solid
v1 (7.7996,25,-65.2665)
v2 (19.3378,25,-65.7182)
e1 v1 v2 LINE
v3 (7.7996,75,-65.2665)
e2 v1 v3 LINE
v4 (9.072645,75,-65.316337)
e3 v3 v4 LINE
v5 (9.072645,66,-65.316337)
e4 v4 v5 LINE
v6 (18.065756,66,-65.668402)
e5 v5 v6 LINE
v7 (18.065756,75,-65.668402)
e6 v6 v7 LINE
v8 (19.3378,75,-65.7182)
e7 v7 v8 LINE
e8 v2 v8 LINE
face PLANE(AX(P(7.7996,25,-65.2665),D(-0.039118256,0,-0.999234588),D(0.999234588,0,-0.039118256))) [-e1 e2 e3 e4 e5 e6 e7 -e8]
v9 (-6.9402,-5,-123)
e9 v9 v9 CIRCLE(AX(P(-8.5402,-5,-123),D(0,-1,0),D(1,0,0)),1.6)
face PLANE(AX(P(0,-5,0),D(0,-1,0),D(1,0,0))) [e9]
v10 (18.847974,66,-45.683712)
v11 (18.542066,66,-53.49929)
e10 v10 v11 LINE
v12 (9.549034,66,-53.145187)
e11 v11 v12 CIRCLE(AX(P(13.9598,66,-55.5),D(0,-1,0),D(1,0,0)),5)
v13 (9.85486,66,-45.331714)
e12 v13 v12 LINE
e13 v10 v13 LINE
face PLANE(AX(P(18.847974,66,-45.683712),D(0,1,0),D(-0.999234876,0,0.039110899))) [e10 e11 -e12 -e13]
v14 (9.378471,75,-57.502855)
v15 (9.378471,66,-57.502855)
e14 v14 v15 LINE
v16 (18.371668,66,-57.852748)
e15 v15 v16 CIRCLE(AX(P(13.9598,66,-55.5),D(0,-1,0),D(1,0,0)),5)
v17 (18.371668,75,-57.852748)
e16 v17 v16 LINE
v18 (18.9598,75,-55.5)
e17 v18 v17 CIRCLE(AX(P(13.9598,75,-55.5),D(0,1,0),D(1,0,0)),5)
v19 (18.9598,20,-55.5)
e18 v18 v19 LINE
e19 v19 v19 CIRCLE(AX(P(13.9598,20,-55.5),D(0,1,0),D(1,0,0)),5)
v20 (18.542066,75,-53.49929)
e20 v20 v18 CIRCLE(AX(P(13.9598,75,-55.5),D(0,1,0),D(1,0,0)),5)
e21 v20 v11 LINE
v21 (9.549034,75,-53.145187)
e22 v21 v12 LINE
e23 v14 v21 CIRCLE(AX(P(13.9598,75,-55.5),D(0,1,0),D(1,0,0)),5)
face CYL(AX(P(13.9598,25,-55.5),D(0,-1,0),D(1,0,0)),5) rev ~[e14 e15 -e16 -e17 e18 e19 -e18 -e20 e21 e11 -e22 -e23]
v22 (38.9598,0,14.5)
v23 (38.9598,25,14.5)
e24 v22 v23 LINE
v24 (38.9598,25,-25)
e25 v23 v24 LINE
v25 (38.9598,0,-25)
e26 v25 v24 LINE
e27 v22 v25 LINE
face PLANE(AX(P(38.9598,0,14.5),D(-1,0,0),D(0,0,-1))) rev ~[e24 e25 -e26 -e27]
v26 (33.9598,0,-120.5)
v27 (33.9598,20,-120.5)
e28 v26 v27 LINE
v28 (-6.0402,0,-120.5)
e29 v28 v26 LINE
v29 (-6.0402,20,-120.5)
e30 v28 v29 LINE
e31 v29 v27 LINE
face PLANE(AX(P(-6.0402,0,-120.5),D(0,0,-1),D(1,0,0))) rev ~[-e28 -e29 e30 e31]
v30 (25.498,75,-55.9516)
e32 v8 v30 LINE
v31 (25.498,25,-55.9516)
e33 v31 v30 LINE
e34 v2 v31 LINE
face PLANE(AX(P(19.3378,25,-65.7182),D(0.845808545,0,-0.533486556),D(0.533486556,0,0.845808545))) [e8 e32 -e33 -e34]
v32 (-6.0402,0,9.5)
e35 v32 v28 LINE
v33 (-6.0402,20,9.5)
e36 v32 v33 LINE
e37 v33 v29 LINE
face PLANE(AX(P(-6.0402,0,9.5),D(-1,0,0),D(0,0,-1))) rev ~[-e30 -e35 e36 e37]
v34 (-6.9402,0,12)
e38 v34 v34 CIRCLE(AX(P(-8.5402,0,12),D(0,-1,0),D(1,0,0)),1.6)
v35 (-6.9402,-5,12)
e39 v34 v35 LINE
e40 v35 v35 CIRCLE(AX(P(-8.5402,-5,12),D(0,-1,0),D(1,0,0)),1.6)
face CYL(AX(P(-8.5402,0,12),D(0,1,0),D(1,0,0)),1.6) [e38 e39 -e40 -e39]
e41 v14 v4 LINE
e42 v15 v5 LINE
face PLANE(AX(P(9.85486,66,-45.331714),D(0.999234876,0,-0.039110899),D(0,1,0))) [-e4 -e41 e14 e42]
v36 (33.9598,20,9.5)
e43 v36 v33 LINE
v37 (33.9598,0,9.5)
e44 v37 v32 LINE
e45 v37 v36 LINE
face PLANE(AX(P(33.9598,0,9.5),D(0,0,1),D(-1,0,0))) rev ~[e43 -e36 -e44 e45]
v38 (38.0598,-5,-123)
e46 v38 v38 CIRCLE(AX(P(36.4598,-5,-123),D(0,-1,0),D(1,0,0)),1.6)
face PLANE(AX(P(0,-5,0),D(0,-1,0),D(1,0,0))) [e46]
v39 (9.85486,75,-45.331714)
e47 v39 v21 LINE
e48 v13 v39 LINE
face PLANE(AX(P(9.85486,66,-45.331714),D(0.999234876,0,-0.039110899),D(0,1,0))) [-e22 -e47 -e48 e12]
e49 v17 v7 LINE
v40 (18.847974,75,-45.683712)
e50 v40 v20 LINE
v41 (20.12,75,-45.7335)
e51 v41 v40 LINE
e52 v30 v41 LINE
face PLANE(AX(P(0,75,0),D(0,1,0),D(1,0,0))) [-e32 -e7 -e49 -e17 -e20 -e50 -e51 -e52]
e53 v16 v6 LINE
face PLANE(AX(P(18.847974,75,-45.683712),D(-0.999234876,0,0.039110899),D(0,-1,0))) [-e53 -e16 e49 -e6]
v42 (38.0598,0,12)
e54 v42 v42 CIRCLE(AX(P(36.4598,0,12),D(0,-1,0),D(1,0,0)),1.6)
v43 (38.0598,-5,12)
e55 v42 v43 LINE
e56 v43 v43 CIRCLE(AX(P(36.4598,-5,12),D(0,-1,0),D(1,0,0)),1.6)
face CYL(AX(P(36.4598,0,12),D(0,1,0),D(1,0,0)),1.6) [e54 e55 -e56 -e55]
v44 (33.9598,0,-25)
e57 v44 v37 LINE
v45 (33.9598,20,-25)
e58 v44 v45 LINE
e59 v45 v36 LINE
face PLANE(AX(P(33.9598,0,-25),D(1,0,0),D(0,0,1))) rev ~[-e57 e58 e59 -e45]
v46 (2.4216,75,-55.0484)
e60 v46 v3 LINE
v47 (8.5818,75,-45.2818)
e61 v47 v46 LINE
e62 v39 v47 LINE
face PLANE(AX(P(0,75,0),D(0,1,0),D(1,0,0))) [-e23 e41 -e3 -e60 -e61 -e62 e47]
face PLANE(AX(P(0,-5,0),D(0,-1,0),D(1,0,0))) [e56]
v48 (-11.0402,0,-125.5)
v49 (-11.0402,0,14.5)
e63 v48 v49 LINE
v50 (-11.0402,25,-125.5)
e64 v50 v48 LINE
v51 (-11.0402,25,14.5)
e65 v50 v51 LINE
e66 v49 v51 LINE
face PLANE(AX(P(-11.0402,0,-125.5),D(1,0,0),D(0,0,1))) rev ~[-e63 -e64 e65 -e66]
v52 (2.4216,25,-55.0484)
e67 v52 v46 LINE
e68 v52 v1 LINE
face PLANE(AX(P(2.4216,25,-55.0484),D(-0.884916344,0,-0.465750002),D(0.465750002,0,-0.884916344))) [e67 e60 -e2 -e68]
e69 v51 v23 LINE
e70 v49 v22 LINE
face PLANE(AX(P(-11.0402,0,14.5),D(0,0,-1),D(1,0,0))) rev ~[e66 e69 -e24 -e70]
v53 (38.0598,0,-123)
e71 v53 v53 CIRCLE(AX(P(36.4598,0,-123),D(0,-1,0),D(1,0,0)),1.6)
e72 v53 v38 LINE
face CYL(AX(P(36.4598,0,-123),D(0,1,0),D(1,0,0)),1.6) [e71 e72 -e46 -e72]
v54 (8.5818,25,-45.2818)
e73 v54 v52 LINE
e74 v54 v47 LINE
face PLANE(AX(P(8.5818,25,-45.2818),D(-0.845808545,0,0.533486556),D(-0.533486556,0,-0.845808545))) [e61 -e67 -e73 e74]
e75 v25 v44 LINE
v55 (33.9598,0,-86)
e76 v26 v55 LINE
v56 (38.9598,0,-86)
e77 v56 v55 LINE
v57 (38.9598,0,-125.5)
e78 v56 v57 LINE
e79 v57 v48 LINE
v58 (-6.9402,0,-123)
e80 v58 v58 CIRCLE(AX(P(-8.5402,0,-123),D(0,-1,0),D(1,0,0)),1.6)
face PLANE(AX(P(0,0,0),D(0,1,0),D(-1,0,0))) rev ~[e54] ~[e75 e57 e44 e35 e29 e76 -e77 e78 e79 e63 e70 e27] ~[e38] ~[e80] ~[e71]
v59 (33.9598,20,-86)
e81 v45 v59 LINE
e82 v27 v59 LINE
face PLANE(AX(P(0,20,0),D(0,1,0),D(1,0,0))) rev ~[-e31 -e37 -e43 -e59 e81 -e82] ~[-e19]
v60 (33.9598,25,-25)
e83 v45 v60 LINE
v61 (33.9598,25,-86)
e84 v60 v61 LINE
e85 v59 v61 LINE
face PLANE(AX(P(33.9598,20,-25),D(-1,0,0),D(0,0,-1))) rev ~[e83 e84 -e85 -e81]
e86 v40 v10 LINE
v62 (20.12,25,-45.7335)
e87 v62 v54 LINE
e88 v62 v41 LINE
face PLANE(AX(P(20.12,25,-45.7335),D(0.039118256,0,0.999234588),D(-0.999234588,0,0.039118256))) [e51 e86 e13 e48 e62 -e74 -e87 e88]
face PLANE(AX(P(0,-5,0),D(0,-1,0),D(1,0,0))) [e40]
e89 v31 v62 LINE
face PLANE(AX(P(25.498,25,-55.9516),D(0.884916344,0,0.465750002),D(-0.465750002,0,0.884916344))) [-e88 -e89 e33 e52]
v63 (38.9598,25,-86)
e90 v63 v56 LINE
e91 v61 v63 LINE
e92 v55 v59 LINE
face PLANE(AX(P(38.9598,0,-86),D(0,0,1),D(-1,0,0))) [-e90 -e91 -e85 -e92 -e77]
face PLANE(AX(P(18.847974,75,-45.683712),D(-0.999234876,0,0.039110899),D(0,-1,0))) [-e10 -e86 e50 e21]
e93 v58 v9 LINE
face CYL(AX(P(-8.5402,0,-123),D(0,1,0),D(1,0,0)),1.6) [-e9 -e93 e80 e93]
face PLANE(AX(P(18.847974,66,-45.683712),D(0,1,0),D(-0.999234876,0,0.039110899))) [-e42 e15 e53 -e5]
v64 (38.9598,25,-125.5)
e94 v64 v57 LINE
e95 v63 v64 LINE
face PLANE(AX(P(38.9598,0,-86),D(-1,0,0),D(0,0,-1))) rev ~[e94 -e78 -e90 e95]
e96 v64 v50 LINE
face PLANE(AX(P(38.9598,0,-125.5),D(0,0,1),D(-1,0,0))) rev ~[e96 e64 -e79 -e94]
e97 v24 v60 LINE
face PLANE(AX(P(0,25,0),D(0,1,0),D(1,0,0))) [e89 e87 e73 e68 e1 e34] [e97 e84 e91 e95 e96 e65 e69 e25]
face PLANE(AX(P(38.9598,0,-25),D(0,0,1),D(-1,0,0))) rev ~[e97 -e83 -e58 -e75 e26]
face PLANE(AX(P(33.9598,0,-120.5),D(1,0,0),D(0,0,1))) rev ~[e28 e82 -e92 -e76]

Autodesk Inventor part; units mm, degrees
ref_plane "YZ Plane" through (0, 0, 0) normal (1, 0, 0) x (0, 1, 0)
ref_plane "XZ Plane" through (0, 0, 0) normal (0, 1, 0) x (-1, 0, 0)
ref_plane "XY Plane" through (0, 0, 0) normal (0, 0, 1) x (1, 0, 0)
sketch "Sketch1" plane through (0, 0, 0) normal (0, 1, 0) x (-1, 0, 0)
  point P0 (0, 0)
sketch "Sketch2" plane through (0, 0, 0) normal (0, 1, 0) x (-1, 0, 0)
  line L0 (11.0402, 14.5) -> (-38.9598, 14.5)
  line L1 (-38.9598, -125.5) -> (11.0402, -125.5)
  line L2 (11.0402, -125.5) -> (11.0402, 14.5)
  line L3 (-38.9598, -25) -> (-33.9598, -25)
  line L4 (-38.9598, -86) -> (-33.9598, -86)
  line L5 (-38.9598, 14.5) -> (-38.9598, -25)
  line L6 (-38.9598, -86) -> (-38.9598, -125.5)
  line L7 (-33.9598, -25) -> (-33.9598, 9.5)
  line L8 (-33.9598, 9.5) -> (6.0402, 9.5)
  line L9 (6.0402, 9.5) -> (6.0402, -120.5)
  line L10 (6.0402, -120.5) -> (-33.9598, -120.5)
  line L11 (-33.9598, -120.5) -> (-33.9598, -86)
  point P0 (0, 0)
  dimension "d0" = 50
  dimension "d1" = 140
  dimension "d2" = 5
  dimension "d3" = 39.5
  dimension "d4" = 39.5
  dimension "d5" = 34.5
  dimension "d6" = 40
  dimension "d7" = 130
extrude "Extrusion1" add sketch "Sketch2" along normal blind 20
sketch "Sketch3" plane through (0, 20, 0) normal (0, 1, 0) x (1, 0, 0)
  line L0 (-11.0402, 125.5) -> (-11.0402, -14.5) projected
  line L1 (38.9598, 125.5) -> (-11.0402, 125.5) projected
  line L2 (-11.0402, -14.5) -> (38.9598, -14.5)
  line L3 (38.9598, 125.5) -> (-11.0402, 125.5)
  line L4 (-11.0402, 125.5) -> (-11.0402, -14.5)
  line L5 (33.9598, 86) -> (38.9598, 86) projected
  line L6 (38.9598, 25) -> (33.9598, 25) projected
  line L7 (33.9598, 25) -> (33.9598, -9.5) projected
  line L8 (33.9598, 25) -> (33.9598, 86)
  line L9 (38.9598, -14.5) -> (38.9598, 25)
  line L10 (38.9598, 86) -> (38.9598, 125.5)
  point P0 (0, 0)
extrude "Extrusion2" add sketch "Sketch3" along normal blind 5
sketch "Sketch4" plane through (0, 25, 0) normal (0, 1, 0) x (1, 0, 0)
  circle A0 centre (13.9598, 55.5) radius 5
  line L0 (-11.0402, -14.5) -> (38.9598, -14.5) projected
  line L1 (38.9598, 86) -> (38.9598, 125.5) projected
  point P0 (0, 0)
  dimension "d12" = 10
  dimension "d13" = 70
  dimension "d14" = 25
extrude "Extrusion3" cut sketch "Sketch4" against normal blind 5
sketch "Sketch5" plane through (0, 0, 0) normal (0, -1, 0) x (1, 0, 0)
  circle A0 centre (36.4598, 12) radius 1.6
  line L0 (38.9598, 14.5) -> (38.9598, -25) projected
  line L1 (-11.0402, 14.5) -> (38.9598, 14.5) projected
  circle A1 centre (36.4598, -123) radius 1.6
  line L2 (38.9598, -125.5) -> (-11.0402, -125.5) projected
  line L3 (38.9598, -86) -> (38.9598, -125.5) projected
  circle A2 centre (-8.5402, -123) radius 1.6
  line L4 (-11.0402, -125.5) -> (-11.0402, 14.5) projected
  circle A3 centre (-8.5402, 12) radius 1.6
  point P0 (0, 0)
  dimension "d17" = 3.2
  dimension "d18" = 2.5
  dimension "d19" = 2.5
  dimension "d20" = 3.2
  dimension "d21" = 2.5
  dimension "d22" = 2.5
  dimension "d23" = 3.2
  dimension "d24" = 2.5
  dimension "d25" = 2.5
  dimension "d26" = 3.2
  dimension "d27" = 2.5
  dimension "d28" = 2.5
extrude "Extrusion4" add sketch "Sketch5" along normal blind 5
sketch "Sketch6" plane through (0, 25, 0) normal (0, 1, 0) x (1, 0, 0)
  circle A0 centre (13.9598, 55.5) radius 5 projected
  line L0 (8.5818, 45.2818) -> (2.4216, 55.0484)
  line L1 (2.4216, 55.0484) -> (7.7996, 65.2665)
  line L2 (7.7996, 65.2665) -> (19.3378, 65.7182)
  line L3 (19.3378, 65.7182) -> (25.498, 55.9516)
  line L4 (25.498, 55.9516) -> (20.12, 45.7335)
  line L5 (20.12, 45.7335) -> (8.5818, 45.2818)
  point P0 (0, 0)
  dimension "d31" = 10
extrude "Extrusion5" add sketch "Sketch6" along normal blind 50
sketch "Sketch7" plane through (20.12, 25, -45.7335) normal (0.0391109, 0, 0.9992349) x (0.9992349, 0, -0.0391109)
  point P0 (-21.8933, -25)
sketch "Sketch8" plane through (20.12, 25, -45.7335) normal (0.0391109, 0, 0.9992349) x (0.9992349, 0, -0.0391109)
  line L0 (-10.7735, 50) -> (-0.7735, 50) projected
  line L1 (-10.273, 50) -> (-1.273, 50)
  line L2 (-1.273, 50) -> (-1.273, 41)
  line L3 (-1.273, 41) -> (-10.273, 41)
  line L4 (-10.273, 41) -> (-10.273, 50)
  line L5 (0, 0) -> (0, 50) projected
  line L6 (-11.547, 0) -> (-11.547, 50) projected
  point P0 (-21.8933, -25)
  point P1 (-1.273, 50)
  dimension "d34" = 9
  dimension "d35" = 9
  dimension "d36" = 1.273
  dimension "d37" = 1.274
extrude "Extrusion6" cut sketch "Sketch8" against normal through all
properties part number "Caja_Antena"
